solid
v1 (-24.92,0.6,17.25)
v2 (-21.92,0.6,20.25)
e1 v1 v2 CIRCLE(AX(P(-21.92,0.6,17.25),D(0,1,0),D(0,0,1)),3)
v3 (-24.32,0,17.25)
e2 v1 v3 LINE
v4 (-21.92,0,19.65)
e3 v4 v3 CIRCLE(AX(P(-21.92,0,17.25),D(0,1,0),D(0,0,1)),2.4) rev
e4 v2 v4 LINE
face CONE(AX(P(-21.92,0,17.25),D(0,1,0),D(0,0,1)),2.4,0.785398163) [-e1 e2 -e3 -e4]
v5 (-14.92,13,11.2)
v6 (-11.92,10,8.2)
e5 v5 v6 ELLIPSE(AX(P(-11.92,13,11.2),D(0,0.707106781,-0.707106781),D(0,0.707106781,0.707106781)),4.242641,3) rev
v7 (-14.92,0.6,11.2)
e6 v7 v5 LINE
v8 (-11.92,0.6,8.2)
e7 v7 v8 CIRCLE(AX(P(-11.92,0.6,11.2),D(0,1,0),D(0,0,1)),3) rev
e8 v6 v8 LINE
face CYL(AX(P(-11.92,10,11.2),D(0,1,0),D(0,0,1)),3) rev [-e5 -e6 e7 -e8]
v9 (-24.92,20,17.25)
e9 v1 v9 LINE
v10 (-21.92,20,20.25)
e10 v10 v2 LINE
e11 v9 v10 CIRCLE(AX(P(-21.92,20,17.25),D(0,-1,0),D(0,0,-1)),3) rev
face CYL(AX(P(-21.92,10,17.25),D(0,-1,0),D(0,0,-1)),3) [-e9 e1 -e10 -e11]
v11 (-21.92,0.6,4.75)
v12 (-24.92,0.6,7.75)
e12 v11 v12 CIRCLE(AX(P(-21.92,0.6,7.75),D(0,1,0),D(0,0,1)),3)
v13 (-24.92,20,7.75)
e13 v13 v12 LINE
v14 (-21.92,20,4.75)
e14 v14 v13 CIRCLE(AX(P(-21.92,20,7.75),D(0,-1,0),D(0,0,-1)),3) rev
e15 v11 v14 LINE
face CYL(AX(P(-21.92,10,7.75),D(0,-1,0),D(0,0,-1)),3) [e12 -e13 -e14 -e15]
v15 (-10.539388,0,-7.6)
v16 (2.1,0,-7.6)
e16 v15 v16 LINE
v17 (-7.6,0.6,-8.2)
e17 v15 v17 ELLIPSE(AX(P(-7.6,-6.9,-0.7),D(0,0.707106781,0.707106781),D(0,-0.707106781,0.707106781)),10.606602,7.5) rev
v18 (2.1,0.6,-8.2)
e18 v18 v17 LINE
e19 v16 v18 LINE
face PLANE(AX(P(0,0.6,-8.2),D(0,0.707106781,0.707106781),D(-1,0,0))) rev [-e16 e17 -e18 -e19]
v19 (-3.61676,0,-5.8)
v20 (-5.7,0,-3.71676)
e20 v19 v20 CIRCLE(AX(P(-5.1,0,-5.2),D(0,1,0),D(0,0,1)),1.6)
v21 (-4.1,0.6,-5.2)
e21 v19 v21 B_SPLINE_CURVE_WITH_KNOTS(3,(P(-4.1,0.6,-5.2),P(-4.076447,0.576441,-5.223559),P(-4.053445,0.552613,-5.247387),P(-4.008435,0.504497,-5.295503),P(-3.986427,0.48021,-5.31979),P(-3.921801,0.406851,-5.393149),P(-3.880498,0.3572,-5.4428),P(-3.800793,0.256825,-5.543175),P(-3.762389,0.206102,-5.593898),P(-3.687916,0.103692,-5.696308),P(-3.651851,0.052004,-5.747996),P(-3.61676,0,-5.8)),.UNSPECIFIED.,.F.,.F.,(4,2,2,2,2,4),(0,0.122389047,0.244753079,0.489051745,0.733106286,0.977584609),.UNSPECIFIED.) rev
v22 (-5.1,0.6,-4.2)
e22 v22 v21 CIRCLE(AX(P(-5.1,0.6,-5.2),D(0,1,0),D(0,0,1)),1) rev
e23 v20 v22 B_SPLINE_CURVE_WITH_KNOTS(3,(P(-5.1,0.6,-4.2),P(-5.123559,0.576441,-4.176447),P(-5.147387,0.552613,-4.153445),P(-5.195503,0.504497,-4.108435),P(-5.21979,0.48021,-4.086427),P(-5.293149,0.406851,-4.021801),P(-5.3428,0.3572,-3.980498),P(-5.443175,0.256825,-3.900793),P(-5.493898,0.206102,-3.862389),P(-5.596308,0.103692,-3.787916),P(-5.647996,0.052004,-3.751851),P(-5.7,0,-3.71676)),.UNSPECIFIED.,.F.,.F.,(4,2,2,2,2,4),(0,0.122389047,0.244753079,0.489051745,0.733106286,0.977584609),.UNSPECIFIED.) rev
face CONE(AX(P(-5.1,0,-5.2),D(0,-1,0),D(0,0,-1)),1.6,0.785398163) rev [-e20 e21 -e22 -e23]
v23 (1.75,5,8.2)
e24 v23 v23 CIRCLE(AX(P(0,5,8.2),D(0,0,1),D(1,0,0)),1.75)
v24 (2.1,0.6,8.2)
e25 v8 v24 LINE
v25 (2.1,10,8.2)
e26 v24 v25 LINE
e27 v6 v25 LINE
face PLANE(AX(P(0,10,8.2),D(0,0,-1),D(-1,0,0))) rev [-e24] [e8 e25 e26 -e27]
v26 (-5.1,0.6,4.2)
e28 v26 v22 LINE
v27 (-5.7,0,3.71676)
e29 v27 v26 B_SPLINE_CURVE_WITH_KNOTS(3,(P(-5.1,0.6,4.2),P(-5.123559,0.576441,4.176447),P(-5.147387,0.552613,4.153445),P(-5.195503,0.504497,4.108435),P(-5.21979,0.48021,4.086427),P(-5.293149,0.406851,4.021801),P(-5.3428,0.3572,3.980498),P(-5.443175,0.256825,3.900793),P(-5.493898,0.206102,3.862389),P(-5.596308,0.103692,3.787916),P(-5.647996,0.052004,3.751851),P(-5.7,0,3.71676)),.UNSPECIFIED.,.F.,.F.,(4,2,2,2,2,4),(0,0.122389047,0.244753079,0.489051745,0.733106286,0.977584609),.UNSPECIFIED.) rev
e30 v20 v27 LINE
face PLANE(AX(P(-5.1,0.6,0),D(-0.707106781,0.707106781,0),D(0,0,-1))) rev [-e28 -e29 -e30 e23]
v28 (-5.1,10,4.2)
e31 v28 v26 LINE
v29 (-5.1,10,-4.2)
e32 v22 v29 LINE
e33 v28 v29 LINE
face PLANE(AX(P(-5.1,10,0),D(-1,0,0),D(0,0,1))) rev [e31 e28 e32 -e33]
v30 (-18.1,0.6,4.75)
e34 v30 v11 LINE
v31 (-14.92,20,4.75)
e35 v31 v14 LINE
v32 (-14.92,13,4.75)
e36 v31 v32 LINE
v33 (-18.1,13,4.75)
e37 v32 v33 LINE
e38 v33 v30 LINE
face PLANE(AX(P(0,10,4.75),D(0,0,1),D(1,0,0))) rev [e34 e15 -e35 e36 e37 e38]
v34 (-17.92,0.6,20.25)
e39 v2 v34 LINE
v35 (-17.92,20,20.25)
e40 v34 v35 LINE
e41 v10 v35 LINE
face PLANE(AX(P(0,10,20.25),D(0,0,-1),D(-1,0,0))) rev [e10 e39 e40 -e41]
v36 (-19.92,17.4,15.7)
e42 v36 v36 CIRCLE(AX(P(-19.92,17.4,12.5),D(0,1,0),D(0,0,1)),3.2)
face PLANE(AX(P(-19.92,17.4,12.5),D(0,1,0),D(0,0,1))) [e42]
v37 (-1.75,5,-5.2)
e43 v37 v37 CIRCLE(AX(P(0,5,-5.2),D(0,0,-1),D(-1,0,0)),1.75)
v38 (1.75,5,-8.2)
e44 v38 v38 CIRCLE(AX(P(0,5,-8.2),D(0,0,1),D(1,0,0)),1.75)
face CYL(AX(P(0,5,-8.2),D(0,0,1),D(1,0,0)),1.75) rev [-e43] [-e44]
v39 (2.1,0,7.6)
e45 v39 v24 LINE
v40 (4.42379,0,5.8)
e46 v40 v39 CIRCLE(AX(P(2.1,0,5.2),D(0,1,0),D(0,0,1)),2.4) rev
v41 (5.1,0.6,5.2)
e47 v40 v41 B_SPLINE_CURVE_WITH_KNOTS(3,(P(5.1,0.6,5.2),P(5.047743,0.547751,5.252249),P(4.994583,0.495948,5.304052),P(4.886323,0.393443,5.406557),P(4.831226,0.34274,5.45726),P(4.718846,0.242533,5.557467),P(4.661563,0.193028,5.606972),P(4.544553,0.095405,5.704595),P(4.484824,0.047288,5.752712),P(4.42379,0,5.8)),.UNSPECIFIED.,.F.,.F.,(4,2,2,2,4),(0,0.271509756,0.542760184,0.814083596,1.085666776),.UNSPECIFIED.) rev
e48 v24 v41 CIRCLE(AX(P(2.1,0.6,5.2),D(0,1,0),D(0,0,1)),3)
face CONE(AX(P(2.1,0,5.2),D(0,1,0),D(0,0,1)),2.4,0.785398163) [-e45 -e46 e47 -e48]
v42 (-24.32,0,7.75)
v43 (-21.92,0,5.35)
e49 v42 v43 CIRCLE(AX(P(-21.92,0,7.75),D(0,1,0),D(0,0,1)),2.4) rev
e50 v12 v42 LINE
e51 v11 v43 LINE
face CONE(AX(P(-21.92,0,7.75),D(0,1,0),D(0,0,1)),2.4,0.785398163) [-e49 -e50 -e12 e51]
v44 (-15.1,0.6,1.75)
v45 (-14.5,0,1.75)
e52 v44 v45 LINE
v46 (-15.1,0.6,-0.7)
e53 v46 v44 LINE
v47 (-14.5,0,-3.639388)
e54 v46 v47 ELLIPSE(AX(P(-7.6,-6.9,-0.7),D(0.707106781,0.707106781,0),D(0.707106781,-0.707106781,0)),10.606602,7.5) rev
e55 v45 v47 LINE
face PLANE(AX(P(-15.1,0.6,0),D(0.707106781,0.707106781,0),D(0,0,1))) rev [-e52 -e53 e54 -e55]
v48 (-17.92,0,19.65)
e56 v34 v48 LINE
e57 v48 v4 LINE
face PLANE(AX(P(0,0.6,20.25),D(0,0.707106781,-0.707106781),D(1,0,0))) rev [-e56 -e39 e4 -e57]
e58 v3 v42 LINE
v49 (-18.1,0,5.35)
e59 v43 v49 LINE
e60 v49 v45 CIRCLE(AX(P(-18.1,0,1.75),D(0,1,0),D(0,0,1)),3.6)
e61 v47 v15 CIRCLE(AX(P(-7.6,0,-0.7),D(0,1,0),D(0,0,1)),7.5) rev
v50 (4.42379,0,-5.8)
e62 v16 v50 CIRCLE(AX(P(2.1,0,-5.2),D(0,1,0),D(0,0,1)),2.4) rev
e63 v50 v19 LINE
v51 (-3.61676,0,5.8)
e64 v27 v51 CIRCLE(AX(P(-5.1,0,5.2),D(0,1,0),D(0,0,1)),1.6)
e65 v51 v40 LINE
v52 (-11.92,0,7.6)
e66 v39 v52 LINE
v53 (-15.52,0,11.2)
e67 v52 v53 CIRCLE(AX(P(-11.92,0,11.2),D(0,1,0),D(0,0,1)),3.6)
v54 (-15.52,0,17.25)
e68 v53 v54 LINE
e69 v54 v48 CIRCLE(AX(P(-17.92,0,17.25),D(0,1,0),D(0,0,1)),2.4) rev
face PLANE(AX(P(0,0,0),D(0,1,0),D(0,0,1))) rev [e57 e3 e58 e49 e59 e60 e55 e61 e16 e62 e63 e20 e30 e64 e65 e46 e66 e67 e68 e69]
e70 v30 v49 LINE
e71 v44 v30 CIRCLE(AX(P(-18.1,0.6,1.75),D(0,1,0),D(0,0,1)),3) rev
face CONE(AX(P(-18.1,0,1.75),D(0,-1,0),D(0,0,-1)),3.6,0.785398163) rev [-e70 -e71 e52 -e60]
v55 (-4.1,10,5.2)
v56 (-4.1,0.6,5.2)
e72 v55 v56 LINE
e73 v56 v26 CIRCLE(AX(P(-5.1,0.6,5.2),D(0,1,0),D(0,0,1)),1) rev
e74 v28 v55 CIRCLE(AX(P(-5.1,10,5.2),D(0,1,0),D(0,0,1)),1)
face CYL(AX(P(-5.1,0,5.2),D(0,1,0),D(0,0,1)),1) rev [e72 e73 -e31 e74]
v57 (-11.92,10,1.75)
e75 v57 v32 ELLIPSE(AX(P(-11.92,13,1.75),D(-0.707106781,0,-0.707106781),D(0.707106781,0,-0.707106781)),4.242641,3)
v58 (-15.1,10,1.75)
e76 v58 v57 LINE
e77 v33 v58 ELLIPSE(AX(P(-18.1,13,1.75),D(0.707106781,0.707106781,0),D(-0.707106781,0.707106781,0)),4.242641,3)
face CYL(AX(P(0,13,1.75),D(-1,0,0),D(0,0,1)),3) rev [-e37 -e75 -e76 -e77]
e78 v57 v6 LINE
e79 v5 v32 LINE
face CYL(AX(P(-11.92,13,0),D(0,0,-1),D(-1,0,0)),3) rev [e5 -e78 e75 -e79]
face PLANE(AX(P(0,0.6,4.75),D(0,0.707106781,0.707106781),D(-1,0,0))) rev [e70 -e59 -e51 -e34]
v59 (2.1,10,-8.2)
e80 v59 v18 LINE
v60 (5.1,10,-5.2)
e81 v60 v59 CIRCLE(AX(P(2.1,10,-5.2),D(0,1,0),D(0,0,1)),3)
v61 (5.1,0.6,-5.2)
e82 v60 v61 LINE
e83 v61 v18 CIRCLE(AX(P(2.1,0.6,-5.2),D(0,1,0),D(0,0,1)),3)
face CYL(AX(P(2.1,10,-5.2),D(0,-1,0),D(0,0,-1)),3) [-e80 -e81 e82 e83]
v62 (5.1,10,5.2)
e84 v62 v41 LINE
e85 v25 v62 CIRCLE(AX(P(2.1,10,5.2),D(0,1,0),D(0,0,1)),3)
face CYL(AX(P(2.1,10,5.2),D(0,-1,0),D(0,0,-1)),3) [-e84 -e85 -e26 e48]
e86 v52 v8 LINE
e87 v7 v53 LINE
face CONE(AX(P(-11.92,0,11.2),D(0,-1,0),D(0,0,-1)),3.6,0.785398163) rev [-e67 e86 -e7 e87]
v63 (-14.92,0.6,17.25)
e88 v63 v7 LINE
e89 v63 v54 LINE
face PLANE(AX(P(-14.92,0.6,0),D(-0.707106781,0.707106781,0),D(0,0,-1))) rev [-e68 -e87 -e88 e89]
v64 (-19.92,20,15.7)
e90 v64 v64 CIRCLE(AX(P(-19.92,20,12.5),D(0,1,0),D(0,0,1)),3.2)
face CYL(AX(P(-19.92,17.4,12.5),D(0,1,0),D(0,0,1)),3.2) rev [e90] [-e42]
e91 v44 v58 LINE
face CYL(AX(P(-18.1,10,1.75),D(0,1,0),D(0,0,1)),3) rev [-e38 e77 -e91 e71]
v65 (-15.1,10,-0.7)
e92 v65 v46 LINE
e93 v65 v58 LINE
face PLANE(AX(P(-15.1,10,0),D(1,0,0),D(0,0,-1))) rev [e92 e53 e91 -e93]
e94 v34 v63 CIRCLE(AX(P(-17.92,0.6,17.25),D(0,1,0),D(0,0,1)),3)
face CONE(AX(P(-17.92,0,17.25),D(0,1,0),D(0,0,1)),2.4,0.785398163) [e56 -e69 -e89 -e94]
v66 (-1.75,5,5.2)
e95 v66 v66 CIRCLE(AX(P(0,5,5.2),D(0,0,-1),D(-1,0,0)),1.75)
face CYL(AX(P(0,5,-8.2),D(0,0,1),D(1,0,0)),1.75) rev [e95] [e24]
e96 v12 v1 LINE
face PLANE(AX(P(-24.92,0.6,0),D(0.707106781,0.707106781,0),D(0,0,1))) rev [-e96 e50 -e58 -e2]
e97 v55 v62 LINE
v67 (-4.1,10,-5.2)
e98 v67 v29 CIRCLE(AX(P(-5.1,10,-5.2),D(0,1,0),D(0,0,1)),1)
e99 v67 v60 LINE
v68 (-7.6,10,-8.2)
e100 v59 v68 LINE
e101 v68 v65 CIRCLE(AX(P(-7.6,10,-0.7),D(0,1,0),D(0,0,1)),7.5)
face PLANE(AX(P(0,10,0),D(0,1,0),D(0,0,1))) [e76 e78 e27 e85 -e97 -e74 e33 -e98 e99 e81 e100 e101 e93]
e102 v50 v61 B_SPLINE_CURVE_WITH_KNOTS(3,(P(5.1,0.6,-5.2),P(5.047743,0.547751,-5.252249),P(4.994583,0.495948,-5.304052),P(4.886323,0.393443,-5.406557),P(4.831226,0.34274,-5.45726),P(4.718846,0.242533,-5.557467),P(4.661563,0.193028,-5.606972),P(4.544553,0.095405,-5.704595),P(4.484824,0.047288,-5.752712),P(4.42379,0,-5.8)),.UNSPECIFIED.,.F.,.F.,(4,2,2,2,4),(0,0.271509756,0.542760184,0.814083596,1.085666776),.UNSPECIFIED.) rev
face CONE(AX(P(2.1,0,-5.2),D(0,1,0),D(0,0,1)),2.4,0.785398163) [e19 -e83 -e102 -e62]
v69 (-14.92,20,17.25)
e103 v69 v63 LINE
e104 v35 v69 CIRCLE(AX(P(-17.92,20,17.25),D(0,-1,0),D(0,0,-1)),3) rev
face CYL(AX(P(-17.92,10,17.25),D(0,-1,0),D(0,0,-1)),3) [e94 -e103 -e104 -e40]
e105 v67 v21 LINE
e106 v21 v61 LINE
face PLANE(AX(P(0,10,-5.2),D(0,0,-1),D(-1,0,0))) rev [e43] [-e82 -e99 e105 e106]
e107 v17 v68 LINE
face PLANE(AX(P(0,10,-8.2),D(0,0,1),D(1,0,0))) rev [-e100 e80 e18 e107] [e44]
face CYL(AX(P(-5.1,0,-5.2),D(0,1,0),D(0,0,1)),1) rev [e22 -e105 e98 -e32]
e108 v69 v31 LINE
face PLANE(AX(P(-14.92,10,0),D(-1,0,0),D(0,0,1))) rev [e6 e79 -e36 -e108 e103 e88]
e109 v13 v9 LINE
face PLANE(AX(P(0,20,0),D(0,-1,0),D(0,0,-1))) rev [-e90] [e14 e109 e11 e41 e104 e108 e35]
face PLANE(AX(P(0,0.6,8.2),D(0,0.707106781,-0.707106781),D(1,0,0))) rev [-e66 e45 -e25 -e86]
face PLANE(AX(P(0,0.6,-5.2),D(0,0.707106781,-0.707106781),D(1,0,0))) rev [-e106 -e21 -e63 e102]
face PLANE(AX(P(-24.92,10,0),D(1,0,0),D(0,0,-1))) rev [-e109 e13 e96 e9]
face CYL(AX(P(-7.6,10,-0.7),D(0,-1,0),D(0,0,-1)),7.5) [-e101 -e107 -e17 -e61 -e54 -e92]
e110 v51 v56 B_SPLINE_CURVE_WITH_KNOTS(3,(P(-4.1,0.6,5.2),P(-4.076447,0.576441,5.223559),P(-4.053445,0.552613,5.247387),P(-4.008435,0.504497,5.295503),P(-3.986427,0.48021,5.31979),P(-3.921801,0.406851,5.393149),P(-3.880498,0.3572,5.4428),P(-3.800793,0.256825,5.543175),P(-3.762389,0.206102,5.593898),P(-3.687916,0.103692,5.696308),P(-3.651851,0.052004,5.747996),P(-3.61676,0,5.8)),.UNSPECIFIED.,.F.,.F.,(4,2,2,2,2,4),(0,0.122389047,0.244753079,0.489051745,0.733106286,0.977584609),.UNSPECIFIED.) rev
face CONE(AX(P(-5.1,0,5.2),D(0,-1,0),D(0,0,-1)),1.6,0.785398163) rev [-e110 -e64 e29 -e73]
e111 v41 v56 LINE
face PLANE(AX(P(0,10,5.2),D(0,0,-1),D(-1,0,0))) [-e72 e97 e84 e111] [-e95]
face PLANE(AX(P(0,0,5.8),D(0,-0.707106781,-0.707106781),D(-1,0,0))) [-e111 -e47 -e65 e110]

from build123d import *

# Parameters (mm, degrees)
EXTRUDE_1_DEPTH     = 10
SKETCH_2_R          = 1.75
CUT_EXTRUDE_1_DEPTH = 32.463731502
SKETCH_3_W          = 10
SKETCH_3_H          = 15.5
EXTRUDE_2_DEPTH     = 10
SKETCH_4_R          = 3.2
CUT_EXTRUDE_2_DEPTH = 2.6
SKETCH_5_R          = 1
CUT_EXTRUDE_3_DEPTH = 34.631367799
FILLET_1_R          = 3
FILLET_2_R          = 3
CHAMFER_1_SIZE      = 0.6
FILLET_3_R          = 7.5


# Some blends are built 0.0001 mm under size
with BuildPart() as part:
    # ｽｹｯﾁ1 → ﾎﾞｽ - 押し出し1 (new body)
    with BuildSketch(Plane(origin=(0, 0, 0), x_dir=(1, 0, 0), z_dir=(0, 1, 0))):
        Polygon((-15.1, -8.2), (5.1, -8.2), (5.1, -5.2), (-5.1, -5.2), (-5.1, 5.2), (5.1, 5.2), (5.1, 8.2), (-15.1, 8.2), align=None)
        Polygon((-15.1, -8.2), (-15.1, -4.75), (-24.92, -4.75), (-24.92, -20.25), (-14.92, -20.25), (-14.92, -8.2), align=None)
    extrude(amount=EXTRUDE_1_DEPTH)

    # ｽｹｯﾁ2 → ｶｯﾄ - 押し出し1 (cut, through all)
    with BuildSketch(Plane.XY.offset(8.2)):
        with Locations((0, 5)):
            Circle(SKETCH_2_R)
    extrude(amount=-CUT_EXTRUDE_1_DEPTH, mode=Mode.SUBTRACT)

    # ｽｹｯﾁ3 → ﾎﾞｽ - 押し出し2 (add)
    with BuildSketch(Plane(origin=(0, 10, 0), x_dir=(1, 0, 0), z_dir=(0, 1, 0))):
        with Locations((-19.92, -12.5)):
            Rectangle(SKETCH_3_W, SKETCH_3_H)
    extrude(amount=EXTRUDE_2_DEPTH)

    # ｽｹｯﾁ4 → ｶｯﾄ - 押し出し2 (cut)
    with BuildSketch(Plane(origin=(0, 20, 0), x_dir=(1, 0, 0), z_dir=(0, 1, 0))):
        with Locations(Location((-19.92, -12.5, 0), (0, 0, 270))):
            Circle(SKETCH_4_R)
    extrude(amount=-CUT_EXTRUDE_2_DEPTH, mode=Mode.SUBTRACT)

    # ｽｹｯﾁ5 → ｶｯﾄ - 押し出し3 (cut, through all)
    with BuildSketch(Plane(origin=(0, 10, 0), x_dir=(1, 0, 0), z_dir=(0, 1, 0))):
        with Locations((-5.1, 5.2)):
            Circle(SKETCH_5_R)
        with Locations((-5.1, -5.2)):
            Circle(SKETCH_5_R)
    extrude(amount=-CUT_EXTRUDE_3_DEPTH, mode=Mode.SUBTRACT)

    # ﾌｨﾚｯﾄ1
    fillet_1_edges = [part.edges().sort_by_distance(p)[0] for p in [
        (-14.92, 10, 20.25),
        (-24.92, 10, 20.25),
        (-24.92, 10, 4.75),
        (-15.1, 5, 4.75),
        (5.1, 5, -8.2),
        (5.1, 5, 8.2),
        (-14.92, 10, 6.475),
        (-14.92, 5, 8.2),
    ]]
    fillet(fillet_1_edges, radius=FILLET_1_R - 0.0001)  # a hair under: the kernel refuses the full size

    # ﾌｨﾚｯﾄ2
    fillet_2_edges = [part.edges().sort_by_distance(p)[0] for p in [
        (-15.01, 10, 4.75),
    ]]
    fillet(fillet_2_edges, radius=FILLET_2_R - 0.0001)  # a hair under: the kernel refuses the full size

    # 面取り1
    # the kernel refuses this chamfer: 0.6 mm, written as the material it takes off along each edge
    with BuildSketch(Plane(origin=(-18.0999, 0, 1.7501), x_dir=(0, 0, 1), z_dir=(-1, 0, 0))) as chamfer_1_piece_1:
        Polygon((2.9999, CHAMFER_1_SIZE), (2.9999 + CHAMFER_1_SIZE, 0), (2.9999, 0), align=None)
    revolve(axis=Axis((-18.0999, 0, 1.7501), (0, 1, 0)), revolution_arc=90, mode=Mode.SUBTRACT)
    with BuildSketch(Plane(origin=(-11.9201, 0, 11.1999), x_dir=(0, 0, -1), z_dir=(1, 0, 0))) as chamfer_1_piece_2:
        Polygon((2.9999, CHAMFER_1_SIZE), (2.9999 + CHAMFER_1_SIZE, 0), (2.9999, 0), align=None)
    revolve(axis=Axis((-11.9201, 0, 11.1999), (0, 1, 0)), revolution_arc=90, mode=Mode.SUBTRACT)
    with BuildSketch(Plane(origin=(-15.1, 0, -9.743009793), x_dir=(-0.027495876610587354, 0.9996219169112968, 0), z_dir=(0, 0, 1))) as chamfer_1_piece_3:
        Polygon((CHAMFER_1_SIZE * 0.999621916911, -CHAMFER_1_SIZE * 0.0274958766106), (-CHAMFER_1_SIZE * 0.0274958766106, -CHAMFER_1_SIZE * 0.999621916911), (0, 0), align=None)
    extrude(amount=11.493109793, mode=Mode.SUBTRACT)
    with BuildSketch(Plane(origin=(-5.643009793, 0, -5.2), x_dir=(0, 0.9996219169112968, 0.027495876610585914), z_dir=(1, 0, 0)), Plane(origin=(6.643009793, 0, 5.2), x_dir=(0, 0.9996219169112968, -0.027495876610585914), z_dir=(-1, 0, 0))) as chamfer_1_piece_4:
        Polygon((CHAMFER_1_SIZE * 0.999621916911, -CHAMFER_1_SIZE * 0.0274958766106), (-CHAMFER_1_SIZE * 0.0274958766106, -CHAMFER_1_SIZE * 0.999621916911), (0, 0), align=None)
    extrude(amount=12.286019586, mode=Mode.SUBTRACT)
    with BuildSketch(Plane(origin=(-5.1, 0, 5.743009793), x_dir=(0.027495876610585914, 0.9996219169112968, 0), z_dir=(0, 0, -1))) as chamfer_1_piece_5:
        Polygon((CHAMFER_1_SIZE * 0.999621916911, -CHAMFER_1_SIZE * 0.0274958766106), (-CHAMFER_1_SIZE * 0.0274958766106, -CHAMFER_1_SIZE * 0.999621916911), (0, 0), align=None)
    extrude(amount=11.486019586, mode=Mode.SUBTRACT)
    with BuildSketch(Plane(origin=(-5.1, 0, 5.2), x_dir=(0.7048818539423609, 0, -0.7093247295722744), z_dir=(0.7093247295722744, 0, 0.7048818539423609))) as chamfer_1_piece_6:
        Polygon((1, CHAMFER_1_SIZE), (1 + CHAMFER_1_SIZE, 0), (1, 0), align=None)
    revolve(axis=Axis((-5.1, 0, 5.2), (0, 1, 0)), revolution_arc=359.64, mode=Mode.SUBTRACT)
    with BuildSketch(Plane(origin=(-5.1, 0, -5.2), x_dir=(0.7093247295722735, 0, 0.7048818539423618), z_dir=(-0.7048818539423618, 0, 0.7093247295722735))) as chamfer_1_piece_7:
        Polygon((1, CHAMFER_1_SIZE), (1 + CHAMFER_1_SIZE, 0), (1, 0), align=None)
    revolve(axis=Axis((-5.1, 0, -5.2), (0, 1, 0)), revolution_arc=359.64, mode=Mode.SUBTRACT)
    with BuildSketch(Plane(origin=(-14.92, 0, 17.2501), x_dir=(0.027495876610587354, 0.9996219169112968, 0), z_dir=(0, 0, -1))) as chamfer_1_piece_8:
        Polygon((CHAMFER_1_SIZE * 0.999621916911, -CHAMFER_1_SIZE * 0.0274958766106), (-CHAMFER_1_SIZE * 0.0274958766106, -CHAMFER_1_SIZE * 0.999621916911), (0, 0), align=None)
    extrude(amount=6.0502, mode=Mode.SUBTRACT)
    with BuildSketch(Plane(origin=(-11.9201, 0, 8.2), x_dir=(0, 0.9996219169112968, 0.027495876610587354), z_dir=(1, 0, 0))) as chamfer_1_piece_9:
        Polygon((CHAMFER_1_SIZE * 0.999621916911, -CHAMFER_1_SIZE * 0.0274958766106), (-CHAMFER_1_SIZE * 0.0274958766106, -CHAMFER_1_SIZE * 0.999621916911), (0, 0), align=None)
    extrude(amount=14.0202, mode=Mode.SUBTRACT)
    with BuildSketch(Plane(origin=(-21.9201, 0, 20.25), x_dir=(0, 0.9996219169112968, 0.027495876610584478), z_dir=(1, 0, 0))) as chamfer_1_piece_10:
        Polygon((CHAMFER_1_SIZE * 0.999621916911, -CHAMFER_1_SIZE * 0.0274958766106), (-CHAMFER_1_SIZE * 0.0274958766106, -CHAMFER_1_SIZE * 0.999621916911), (0, 0), align=None)
    extrude(amount=4.0002, mode=Mode.SUBTRACT)
    with BuildSketch(Plane(origin=(-24.92, 0, 7.7499), x_dir=(-0.027495876610584478, 0.9996219169112968, 0), z_dir=(0, 0, 1))) as chamfer_1_piece_11:
        Polygon((CHAMFER_1_SIZE * 0.999621916911, -CHAMFER_1_SIZE * 0.0274958766106), (-CHAMFER_1_SIZE * 0.0274958766106, -CHAMFER_1_SIZE * 0.999621916911), (0, 0), align=None)
    extrude(amount=9.5002, mode=Mode.SUBTRACT)
    with BuildSketch(Plane(origin=(-18.0999, 0, 4.75), x_dir=(0, -0.02749587661058641, 0.9996219169112968), z_dir=(-1, 0, 0))) as chamfer_1_piece_12:
        Polygon((CHAMFER_1_SIZE * 0.999621916911, CHAMFER_1_SIZE * 0.0274958766106), (-CHAMFER_1_SIZE * 0.0274958766106, CHAMFER_1_SIZE * 0.999621916911), (0, 0), align=None)
    extrude(amount=3.8202, mode=Mode.SUBTRACT)
    with BuildSketch(Plane(origin=(2.1001, 0, -8.2), x_dir=(0, 0.9996219169112968, -0.027495876610587354), z_dir=(-1, 0, 0))) as chamfer_1_piece_13:
        Polygon((CHAMFER_1_SIZE * 0.999621916911, -CHAMFER_1_SIZE * 0.0274958766106), (-CHAMFER_1_SIZE * 0.0274958766106, -CHAMFER_1_SIZE * 0.999621916911), (0, 0), align=None)
    extrude(amount=18.743109793, mode=Mode.SUBTRACT)
    with BuildSketch(Plane(origin=(2.1001, 0, 5.2001), x_dir=(0, 0, 1), z_dir=(-1, 0, 0))) as chamfer_1_piece_14:
        Polygon((2.9999, CHAMFER_1_SIZE), (2.9999 - CHAMFER_1_SIZE, 0), (2.9999, 0), align=None)
    revolve(axis=Axis((2.1001, 0, 5.2001), (0, 1, 0)), revolution_arc=90, mode=Mode.SUBTRACT)
    with BuildSketch(Plane(origin=(2.1001, 0, -5.2001), x_dir=(0, 0, -1), z_dir=(-1, 0, 0))) as chamfer_1_piece_15:
        Polygon((2.9999, -CHAMFER_1_SIZE), (2.9999 - CHAMFER_1_SIZE, 0), (2.9999, 0), align=None)
    revolve(axis=Axis((2.1001, 0, -5.2001), (0, -1, 0)), revolution_arc=90, mode=Mode.SUBTRACT)
    with BuildSketch(Plane(origin=(-21.9201, 0, 7.7499), x_dir=(-1, 0, 0), z_dir=(0, 0, 1))) as chamfer_1_piece_16:
        Polygon((2.9999, -CHAMFER_1_SIZE), (2.9999 - CHAMFER_1_SIZE, 0), (2.9999, 0), align=None)
    revolve(axis=Axis((-21.9201, 0, 7.7499), (0, -1, 0)), revolution_arc=90, mode=Mode.SUBTRACT)
    with BuildSketch(Plane(origin=(-21.9201, 0, 17.2501), x_dir=(0, 0, 1), z_dir=(1, 0, 0))) as chamfer_1_piece_17:
        Polygon((2.9999, -CHAMFER_1_SIZE), (2.9999 - CHAMFER_1_SIZE, 0), (2.9999, 0), align=None)
    revolve(axis=Axis((-21.9201, 0, 17.2501), (0, -1, 0)), revolution_arc=90, mode=Mode.SUBTRACT)
    with BuildSketch(Plane(origin=(-17.9199, 0, 17.2501), x_dir=(1, 0, 0), z_dir=(0, 0, -1))) as chamfer_1_piece_18:
        Polygon((2.9999, -CHAMFER_1_SIZE), (2.9999 - CHAMFER_1_SIZE, 0), (2.9999, 0), align=None)
    revolve(axis=Axis((-17.9199, 0, 17.2501), (0, -1, 0)), revolution_arc=90, mode=Mode.SUBTRACT)
    with BuildSketch(Plane(origin=(5.1, 0, -3.656990207), x_dir=(0.027495876610585918, 0.9996219169112968, 0), z_dir=(0, 0, -1)), Plane(origin=(5.1, 0, 5.2001), x_dir=(0.027495876610585918, 0.9996219169112968, 0), z_dir=(0, 0, -1))) as chamfer_1_piece_19:
        Polygon((CHAMFER_1_SIZE * 0.999621916911, -CHAMFER_1_SIZE * 0.0274958766106), (-CHAMFER_1_SIZE * 0.0274958766106, -CHAMFER_1_SIZE * 0.999621916911), (0, 0), align=None)
    extrude(amount=1.543109793, mode=Mode.SUBTRACT)

    # ﾌｨﾚｯﾄ3
    # the kernel refuses this fillet: 7.5 mm, written as the material it takes off along each edge
    with BuildSketch(Plane(origin=(-15.1, -18.15, -8.2), x_dir=(0, 0, 1), z_dir=(0, 1, 0))) as fillet_3_piece_1:
        with BuildLine():
            CenterArc((FILLET_3_R, FILLET_3_R), FILLET_3_R, 180, 90)
            Line((0, FILLET_3_R), (0, 0))
            Line((0, 0), (FILLET_3_R, 0))
        make_face()
    extrude(amount=46.9, mode=Mode.SUBTRACT)


solid = part.part
